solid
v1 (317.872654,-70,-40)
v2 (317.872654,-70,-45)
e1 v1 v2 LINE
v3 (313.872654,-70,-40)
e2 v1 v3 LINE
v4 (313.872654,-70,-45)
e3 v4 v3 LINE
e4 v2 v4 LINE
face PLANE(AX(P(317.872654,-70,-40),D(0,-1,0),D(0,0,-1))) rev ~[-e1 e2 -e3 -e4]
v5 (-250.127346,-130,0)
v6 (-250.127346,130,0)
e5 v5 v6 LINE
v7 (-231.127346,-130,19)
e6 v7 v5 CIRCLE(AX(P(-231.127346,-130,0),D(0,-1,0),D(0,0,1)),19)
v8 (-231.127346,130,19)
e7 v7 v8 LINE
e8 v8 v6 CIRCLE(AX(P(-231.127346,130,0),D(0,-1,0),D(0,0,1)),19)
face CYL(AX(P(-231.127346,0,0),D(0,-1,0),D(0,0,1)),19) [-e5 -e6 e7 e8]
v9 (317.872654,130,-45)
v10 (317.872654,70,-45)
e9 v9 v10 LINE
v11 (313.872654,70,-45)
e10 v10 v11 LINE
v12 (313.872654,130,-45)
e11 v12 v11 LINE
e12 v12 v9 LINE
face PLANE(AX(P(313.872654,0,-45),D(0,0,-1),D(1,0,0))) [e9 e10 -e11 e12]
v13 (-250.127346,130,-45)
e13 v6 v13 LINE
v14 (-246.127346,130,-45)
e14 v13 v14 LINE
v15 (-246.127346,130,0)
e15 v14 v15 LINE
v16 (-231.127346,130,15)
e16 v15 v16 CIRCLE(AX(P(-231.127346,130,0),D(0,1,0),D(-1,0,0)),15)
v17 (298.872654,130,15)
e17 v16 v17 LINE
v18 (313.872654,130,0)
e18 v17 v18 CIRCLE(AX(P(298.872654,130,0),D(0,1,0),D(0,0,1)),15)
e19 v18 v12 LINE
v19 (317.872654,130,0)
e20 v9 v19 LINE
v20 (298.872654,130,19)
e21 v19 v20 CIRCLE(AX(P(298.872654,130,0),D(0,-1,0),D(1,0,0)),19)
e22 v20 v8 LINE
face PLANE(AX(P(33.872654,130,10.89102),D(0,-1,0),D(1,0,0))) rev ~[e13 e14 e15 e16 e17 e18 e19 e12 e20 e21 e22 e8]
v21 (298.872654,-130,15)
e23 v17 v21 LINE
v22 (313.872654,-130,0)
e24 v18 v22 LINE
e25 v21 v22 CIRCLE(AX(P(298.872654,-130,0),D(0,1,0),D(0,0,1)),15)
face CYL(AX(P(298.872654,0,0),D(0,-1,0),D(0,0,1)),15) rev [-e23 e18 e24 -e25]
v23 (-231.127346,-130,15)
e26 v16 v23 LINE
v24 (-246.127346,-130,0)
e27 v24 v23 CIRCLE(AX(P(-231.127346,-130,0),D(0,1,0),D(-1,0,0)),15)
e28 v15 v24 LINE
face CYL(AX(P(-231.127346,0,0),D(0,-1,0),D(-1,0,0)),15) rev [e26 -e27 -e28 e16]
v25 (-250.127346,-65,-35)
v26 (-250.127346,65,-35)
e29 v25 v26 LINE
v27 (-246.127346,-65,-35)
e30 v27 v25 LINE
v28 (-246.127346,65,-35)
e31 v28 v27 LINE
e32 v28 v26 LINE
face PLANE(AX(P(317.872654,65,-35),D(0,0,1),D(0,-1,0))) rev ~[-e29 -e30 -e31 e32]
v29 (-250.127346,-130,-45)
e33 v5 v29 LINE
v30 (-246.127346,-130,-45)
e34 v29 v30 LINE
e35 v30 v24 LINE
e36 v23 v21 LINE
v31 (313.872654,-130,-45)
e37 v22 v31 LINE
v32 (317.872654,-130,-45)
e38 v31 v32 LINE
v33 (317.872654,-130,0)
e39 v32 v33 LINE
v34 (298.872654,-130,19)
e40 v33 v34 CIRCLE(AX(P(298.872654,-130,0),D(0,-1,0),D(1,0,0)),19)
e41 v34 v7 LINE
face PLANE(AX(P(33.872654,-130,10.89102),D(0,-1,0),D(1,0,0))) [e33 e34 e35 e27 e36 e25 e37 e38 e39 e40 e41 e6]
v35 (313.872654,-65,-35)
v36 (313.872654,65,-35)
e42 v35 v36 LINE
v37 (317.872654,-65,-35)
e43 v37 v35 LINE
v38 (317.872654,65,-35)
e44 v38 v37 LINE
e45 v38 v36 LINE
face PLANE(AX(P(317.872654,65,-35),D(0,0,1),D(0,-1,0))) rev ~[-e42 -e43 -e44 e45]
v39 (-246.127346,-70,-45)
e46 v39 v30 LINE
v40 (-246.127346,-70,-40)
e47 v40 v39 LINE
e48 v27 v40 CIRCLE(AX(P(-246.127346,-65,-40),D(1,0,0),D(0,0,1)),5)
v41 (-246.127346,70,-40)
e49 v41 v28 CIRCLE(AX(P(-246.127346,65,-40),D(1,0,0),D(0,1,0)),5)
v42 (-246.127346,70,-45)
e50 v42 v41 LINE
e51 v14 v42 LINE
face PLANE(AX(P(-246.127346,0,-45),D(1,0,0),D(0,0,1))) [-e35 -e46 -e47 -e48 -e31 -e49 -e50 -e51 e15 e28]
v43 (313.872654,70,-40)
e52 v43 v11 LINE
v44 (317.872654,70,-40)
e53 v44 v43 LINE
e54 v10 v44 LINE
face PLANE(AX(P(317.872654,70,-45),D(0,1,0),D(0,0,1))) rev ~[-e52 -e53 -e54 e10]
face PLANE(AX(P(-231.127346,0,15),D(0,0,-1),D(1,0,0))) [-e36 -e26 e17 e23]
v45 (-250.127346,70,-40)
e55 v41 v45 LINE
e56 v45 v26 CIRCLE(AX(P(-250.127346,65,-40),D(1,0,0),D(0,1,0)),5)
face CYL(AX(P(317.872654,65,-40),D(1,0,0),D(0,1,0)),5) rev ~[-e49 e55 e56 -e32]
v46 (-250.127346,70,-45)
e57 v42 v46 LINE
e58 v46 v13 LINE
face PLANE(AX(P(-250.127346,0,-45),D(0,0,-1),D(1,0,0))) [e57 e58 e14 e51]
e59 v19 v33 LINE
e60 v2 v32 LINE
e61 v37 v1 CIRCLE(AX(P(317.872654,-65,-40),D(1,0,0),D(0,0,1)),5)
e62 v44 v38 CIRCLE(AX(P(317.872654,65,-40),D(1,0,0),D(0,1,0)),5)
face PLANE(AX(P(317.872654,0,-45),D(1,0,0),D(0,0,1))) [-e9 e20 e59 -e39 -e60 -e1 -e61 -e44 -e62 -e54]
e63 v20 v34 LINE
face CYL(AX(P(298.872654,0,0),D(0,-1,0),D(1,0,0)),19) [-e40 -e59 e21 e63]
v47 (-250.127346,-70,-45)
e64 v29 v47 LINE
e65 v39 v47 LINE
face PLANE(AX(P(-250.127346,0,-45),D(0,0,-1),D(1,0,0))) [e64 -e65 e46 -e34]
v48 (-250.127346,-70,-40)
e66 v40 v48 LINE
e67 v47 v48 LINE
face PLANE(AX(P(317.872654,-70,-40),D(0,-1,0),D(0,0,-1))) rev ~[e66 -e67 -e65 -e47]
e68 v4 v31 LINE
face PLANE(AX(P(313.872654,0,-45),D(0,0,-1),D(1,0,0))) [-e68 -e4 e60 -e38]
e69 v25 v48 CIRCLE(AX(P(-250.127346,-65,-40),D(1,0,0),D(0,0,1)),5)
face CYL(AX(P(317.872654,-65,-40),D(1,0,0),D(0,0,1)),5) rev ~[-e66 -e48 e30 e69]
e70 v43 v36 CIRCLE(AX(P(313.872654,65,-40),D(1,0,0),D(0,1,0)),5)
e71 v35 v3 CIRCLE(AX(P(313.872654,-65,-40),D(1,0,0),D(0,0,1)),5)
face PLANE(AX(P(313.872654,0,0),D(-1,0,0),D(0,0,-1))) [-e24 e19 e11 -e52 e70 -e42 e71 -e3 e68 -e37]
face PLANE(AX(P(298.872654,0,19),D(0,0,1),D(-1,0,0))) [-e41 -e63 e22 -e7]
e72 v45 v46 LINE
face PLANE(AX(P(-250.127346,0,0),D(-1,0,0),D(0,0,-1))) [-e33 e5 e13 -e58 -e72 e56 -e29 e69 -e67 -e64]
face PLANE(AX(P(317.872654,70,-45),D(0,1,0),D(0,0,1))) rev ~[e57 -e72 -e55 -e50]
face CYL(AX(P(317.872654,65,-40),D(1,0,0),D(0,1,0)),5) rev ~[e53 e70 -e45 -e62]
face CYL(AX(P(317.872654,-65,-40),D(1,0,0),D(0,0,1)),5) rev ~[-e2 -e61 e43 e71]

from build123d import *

# Parameters (mm, degrees)
F1_DEPTH = 130
F3_DEPTH = 600


with BuildPart() as f1:
    # F0 (on Front) → F1 (new body, symmetric)
    with BuildSketch(Plane.XZ):
        with BuildLine():
            Line((-250.1273464697, -45), (-246.1273464697, -45))
            Line((-246.1273464697, -45), (-246.1273464697, 0))
            ThreePointArc((-246.1273464697, 0), (-241.7339481875, 10.6066017178), (-231.1273464697, 15))
            Line((-231.1273464697, 15), (298.8726535303, 15))
            ThreePointArc((298.8726535303, 15), (309.4792552481, 10.6066017178), (313.8726535303, 0))
            Line((313.8726535303, 0), (313.8726535303, -45))
            Line((313.8726535303, -45), (317.8726535303, -45))
            Line((317.8726535303, -45), (317.8726535303, 0))
            ThreePointArc((317.8726535303, 0), (312.3076823729, 13.4350288425), (298.8726535303, 19))
            Line((298.8726535303, 19), (-231.1273464697, 19))
            ThreePointArc((-231.1273464697, 19), (-244.5623753122, 13.4350288425), (-250.1273464697, 0))
            Line((-250.1273464697, 0), (-250.1273464697, -45))
        make_face()
    extrude(amount=F1_DEPTH, both=True)

    # F2 (on face) → F3 (cut)
    with BuildSketch(Plane.YZ.offset(317.8726535303)):
        with BuildLine():
            Line((-70, -45), (70, -45))
            Line((70, -45), (70, -40))
            ThreePointArc((70, -40), (68.5355339059, -36.4644660941), (65, -35))
            Line((65, -35), (-65, -35))
            ThreePointArc((-65, -35), (-68.5355339059, -36.4644660941), (-70, -40))
            Line((-70, -40), (-70, -45))
        make_face()
    extrude(amount=-F3_DEPTH, mode=Mode.SUBTRACT)


solid = f1.part
